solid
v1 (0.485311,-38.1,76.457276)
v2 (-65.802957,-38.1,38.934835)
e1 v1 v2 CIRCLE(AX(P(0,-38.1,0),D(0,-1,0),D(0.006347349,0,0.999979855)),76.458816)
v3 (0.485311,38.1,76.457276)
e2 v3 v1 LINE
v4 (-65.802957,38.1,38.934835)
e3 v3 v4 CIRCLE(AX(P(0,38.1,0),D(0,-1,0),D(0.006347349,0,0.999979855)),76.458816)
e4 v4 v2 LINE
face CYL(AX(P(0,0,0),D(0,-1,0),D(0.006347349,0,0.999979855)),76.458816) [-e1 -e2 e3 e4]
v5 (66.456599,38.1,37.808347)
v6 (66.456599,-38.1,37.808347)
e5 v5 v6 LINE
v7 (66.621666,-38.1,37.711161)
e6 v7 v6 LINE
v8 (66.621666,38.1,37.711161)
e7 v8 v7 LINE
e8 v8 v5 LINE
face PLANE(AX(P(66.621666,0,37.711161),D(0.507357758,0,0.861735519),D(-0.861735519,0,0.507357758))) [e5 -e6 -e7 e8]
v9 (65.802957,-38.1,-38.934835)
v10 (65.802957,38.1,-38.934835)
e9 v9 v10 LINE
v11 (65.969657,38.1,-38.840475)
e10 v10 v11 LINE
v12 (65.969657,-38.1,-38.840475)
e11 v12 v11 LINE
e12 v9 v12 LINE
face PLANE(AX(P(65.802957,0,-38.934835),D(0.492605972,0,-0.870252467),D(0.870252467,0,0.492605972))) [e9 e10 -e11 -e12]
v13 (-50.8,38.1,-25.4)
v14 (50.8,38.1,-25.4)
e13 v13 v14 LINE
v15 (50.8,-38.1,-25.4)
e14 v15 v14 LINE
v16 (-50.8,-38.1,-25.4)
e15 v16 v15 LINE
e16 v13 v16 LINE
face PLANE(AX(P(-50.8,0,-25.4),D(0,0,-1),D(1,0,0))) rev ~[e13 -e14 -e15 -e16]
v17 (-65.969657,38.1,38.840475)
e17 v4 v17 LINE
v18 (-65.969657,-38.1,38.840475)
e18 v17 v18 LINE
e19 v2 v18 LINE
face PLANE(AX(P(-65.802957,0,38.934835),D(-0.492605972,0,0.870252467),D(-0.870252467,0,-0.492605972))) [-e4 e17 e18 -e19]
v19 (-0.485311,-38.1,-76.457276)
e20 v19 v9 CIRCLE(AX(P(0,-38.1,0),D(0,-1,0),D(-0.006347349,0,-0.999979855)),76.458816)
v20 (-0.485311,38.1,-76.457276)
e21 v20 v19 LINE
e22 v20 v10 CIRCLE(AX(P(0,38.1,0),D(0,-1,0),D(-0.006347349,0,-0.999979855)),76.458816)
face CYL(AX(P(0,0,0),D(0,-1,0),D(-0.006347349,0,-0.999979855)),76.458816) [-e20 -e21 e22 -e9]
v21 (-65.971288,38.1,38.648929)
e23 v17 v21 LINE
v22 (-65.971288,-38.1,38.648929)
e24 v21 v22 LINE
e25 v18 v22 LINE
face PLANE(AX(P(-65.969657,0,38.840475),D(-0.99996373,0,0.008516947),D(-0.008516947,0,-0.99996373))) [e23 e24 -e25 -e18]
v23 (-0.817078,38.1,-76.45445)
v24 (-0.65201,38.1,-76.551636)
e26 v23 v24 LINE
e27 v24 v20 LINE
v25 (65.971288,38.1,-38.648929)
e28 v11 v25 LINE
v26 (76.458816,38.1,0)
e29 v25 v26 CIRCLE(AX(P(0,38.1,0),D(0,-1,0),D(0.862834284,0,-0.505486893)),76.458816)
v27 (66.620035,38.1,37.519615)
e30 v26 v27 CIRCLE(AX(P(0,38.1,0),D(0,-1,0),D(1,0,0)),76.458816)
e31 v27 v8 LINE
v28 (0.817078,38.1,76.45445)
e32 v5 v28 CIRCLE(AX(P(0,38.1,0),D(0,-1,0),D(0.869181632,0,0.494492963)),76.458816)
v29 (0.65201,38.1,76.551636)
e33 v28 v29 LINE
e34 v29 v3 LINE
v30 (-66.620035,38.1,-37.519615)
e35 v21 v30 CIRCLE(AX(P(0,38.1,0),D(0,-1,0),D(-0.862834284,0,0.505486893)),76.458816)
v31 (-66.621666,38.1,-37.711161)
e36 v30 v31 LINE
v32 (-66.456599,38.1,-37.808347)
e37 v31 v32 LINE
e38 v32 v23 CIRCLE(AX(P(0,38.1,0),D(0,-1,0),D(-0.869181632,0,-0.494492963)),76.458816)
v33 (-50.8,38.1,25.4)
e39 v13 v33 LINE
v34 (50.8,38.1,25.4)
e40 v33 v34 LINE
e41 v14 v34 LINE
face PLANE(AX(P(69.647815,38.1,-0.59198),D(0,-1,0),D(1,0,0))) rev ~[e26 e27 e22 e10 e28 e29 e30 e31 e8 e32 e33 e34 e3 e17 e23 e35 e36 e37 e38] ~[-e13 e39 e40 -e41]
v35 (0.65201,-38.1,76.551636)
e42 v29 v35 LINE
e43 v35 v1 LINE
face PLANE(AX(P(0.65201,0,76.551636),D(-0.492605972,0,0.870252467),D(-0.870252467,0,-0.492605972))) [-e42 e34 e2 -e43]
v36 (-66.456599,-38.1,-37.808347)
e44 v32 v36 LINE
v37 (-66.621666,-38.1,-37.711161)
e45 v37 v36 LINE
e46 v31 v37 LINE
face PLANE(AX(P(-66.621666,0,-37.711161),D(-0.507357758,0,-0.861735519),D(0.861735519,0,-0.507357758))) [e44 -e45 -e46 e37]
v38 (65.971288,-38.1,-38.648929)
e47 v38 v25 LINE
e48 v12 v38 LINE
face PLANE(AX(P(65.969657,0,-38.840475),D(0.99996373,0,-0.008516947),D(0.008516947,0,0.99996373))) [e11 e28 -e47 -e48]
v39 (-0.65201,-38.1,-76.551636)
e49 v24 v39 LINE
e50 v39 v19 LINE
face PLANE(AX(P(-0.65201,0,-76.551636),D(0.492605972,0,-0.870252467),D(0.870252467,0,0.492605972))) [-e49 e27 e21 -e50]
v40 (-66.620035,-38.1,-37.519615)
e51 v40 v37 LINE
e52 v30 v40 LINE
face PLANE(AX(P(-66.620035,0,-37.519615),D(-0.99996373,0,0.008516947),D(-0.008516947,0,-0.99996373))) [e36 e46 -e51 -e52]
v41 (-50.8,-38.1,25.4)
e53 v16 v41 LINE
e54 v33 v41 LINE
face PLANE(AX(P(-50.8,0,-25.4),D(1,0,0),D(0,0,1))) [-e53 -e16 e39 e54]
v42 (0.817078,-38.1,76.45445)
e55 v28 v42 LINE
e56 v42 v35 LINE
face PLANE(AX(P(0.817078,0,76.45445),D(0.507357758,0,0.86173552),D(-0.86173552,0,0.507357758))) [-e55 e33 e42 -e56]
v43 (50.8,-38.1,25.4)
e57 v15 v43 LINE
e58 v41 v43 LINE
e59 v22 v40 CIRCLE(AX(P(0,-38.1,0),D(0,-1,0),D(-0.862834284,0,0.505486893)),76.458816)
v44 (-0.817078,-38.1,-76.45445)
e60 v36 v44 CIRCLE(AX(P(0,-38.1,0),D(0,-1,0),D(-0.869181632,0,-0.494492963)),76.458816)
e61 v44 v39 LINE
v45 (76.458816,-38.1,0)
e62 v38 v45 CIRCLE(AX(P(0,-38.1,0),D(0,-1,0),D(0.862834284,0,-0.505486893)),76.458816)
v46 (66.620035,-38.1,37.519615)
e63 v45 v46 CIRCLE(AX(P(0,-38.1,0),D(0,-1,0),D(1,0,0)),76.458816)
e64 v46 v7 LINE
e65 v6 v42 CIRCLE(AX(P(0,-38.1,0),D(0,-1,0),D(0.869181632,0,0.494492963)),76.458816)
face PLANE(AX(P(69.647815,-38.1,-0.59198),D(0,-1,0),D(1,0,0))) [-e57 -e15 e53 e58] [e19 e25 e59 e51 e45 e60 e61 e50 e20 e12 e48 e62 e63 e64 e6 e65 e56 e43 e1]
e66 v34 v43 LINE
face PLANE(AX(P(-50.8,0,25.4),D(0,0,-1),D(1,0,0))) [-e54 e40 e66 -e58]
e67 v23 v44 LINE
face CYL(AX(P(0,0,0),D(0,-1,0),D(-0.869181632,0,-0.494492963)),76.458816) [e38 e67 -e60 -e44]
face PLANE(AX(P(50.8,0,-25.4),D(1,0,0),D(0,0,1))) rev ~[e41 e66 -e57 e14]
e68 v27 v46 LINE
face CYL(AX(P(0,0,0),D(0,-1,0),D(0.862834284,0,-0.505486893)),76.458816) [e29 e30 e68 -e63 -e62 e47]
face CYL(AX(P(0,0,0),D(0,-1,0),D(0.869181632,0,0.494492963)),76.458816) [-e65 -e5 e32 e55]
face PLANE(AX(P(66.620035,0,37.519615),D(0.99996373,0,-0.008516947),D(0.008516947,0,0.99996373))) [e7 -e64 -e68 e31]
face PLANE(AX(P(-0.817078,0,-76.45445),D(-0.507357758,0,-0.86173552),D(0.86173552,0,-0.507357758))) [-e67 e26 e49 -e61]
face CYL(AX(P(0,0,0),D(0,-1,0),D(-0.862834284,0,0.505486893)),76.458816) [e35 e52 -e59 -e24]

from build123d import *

# Parameters (mm, degrees)
F0_W     = 101.6
F0_H     = 50.8
F1_DEPTH = 38.1


with BuildPart() as f1:
    # F0 (on Front) → F1 (new body, symmetric)
    with BuildSketch(Plane.XZ):
        with BuildLine():
            ThreePointArc((65.9712880145, -38.6489294899), (73.7903692418, -20.0232864477), (76.4588163197, 0))
            ThreePointArc((76.4588163197, 0), (73.9582301549, 19.3940915064), (66.6200350394, 37.5196151947))
            Line((66.6200350394, 37.5196151947), (65.9712880145, -38.6489294899))
        make_face()
        with BuildLine():
            Line((65.9712880145, -38.6489294899), (66.6200350394, 37.5196151947))
            ThreePointArc((66.6200350394, 37.5196151947), (66.5384735192, 37.6640695456), (66.4565987746, 37.808346596))
            Line((66.4565987746, 37.808346596), (0.8170776208, 76.4544503425))
            ThreePointArc((0.8170776208, 76.4544503425), (0.6511957232, 76.4560431695), (0.4853107601, 76.4572760859))
            Line((0.4853107601, 76.4572760859), (-65.8029574185, 38.9348351477))
            ThreePointArc((-65.8029574185, 38.9348351477), (-65.887277796, 38.7919736239), (-65.9712880145, 38.6489294899))
            Line((-65.9712880145, 38.6489294899), (-66.6200350394, -37.5196151947))
            ThreePointArc((-66.6200350394, -37.5196151947), (-66.5384735192, -37.6640695456), (-66.4565987746, -37.808346596))
            Line((-66.4565987746, -37.808346596), (-0.8170776208, -76.4544503425))
            ThreePointArc((-0.8170776208, -76.4544503425), (-0.6511957232, -76.4560431695), (-0.4853107601, -76.4572760859))
            Line((-0.4853107601, -76.4572760859), (65.8029574185, -38.9348351477))
            ThreePointArc((65.8029574185, -38.9348351477), (65.887277796, -38.7919736239), (65.9712880145, -38.6489294899))
        make_face()
        Rectangle(F0_W, F0_H, mode=Mode.SUBTRACT)
        with BuildLine():
            ThreePointArc((66.4565987746, 37.808346596), (66.5384735192, 37.6640695456), (66.6200350394, 37.5196151947))
            Line((66.6200350394, 37.5196151947), (66.6216664831, 37.7111608811))
            Line((66.6216664831, 37.7111608811), (66.4565987746, 37.808346596))
        make_face()
        with BuildLine():
            Line((65.9696565708, -38.8404751763), (65.9712880145, -38.6489294899))
            ThreePointArc((65.9712880145, -38.6489294899), (65.887277796, -38.7919736239), (65.8029574185, -38.9348351477))
            Line((65.8029574185, -38.9348351477), (65.9696565708, -38.8404751763))
        make_face()
        with BuildLine():
            Line((0.8170776208, 76.4544503425), (66.4565987746, 37.808346596))
            ThreePointArc((66.4565987746, 37.808346596), (38.7919736239, 65.887277796), (0.8170776208, 76.4544503425))
        make_face()
        with BuildLine():
            ThreePointArc((-0.4853107601, -76.4572760859), (37.6640695456, -66.5384735192), (65.8029574185, -38.9348351477))
            Line((65.8029574185, -38.9348351477), (-0.4853107601, -76.4572760859))
        make_face()
        with BuildLine():
            ThreePointArc((0.4853107601, 76.4572760859), (0.6511957232, 76.4560431695), (0.8170776208, 76.4544503425))
            Line((0.8170776208, 76.4544503425), (0.6520099123, 76.5516360573))
            Line((0.6520099123, 76.5516360573), (0.4853107601, 76.4572760859))
        make_face()
        with BuildLine():
            Line((-0.6520099123, -76.5516360573), (-0.4853107601, -76.4572760859))
            ThreePointArc((-0.4853107601, -76.4572760859), (-0.6511957232, -76.4560431695), (-0.8170776208, -76.4544503425))
            Line((-0.8170776208, -76.4544503425), (-0.6520099123, -76.5516360573))
        make_face()
        with BuildLine():
            Line((-65.8029574185, 38.9348351477), (0.4853107601, 76.4572760859))
            ThreePointArc((0.4853107601, 76.4572760859), (-37.6640695456, 66.5384735192), (-65.8029574185, 38.9348351477))
        make_face()
        with BuildLine():
            ThreePointArc((-66.4565987746, -37.808346596), (-38.7919736239, -65.887277796), (-0.8170776208, -76.4544503425))
            Line((-0.8170776208, -76.4544503425), (-66.4565987746, -37.808346596))
        make_face()
        with BuildLine():
            ThreePointArc((-65.9712880145, 38.6489294899), (-65.887277796, 38.7919736239), (-65.8029574185, 38.9348351477))
            Line((-65.8029574185, 38.9348351477), (-65.9696565708, 38.8404751763))
            Line((-65.9696565708, 38.8404751763), (-65.9712880145, 38.6489294899))
        make_face()
        with BuildLine():
            Line((-66.6216664831, -37.7111608811), (-66.4565987746, -37.808346596))
            ThreePointArc((-66.4565987746, -37.808346596), (-66.5384735192, -37.6640695456), (-66.6200350394, -37.5196151947))
            Line((-66.6200350394, -37.5196151947), (-66.6216664831, -37.7111608811))
        make_face()
        with BuildLine():
            Line((-66.6200350394, -37.5196151947), (-65.9712880145, 38.6489294899))
            ThreePointArc((-65.9712880145, 38.6489294899), (-76.4560431695, 0.6511957232), (-66.6200350394, -37.5196151947))
        make_face()
    extrude(amount=F1_DEPTH, both=True)


solid = f1.part
